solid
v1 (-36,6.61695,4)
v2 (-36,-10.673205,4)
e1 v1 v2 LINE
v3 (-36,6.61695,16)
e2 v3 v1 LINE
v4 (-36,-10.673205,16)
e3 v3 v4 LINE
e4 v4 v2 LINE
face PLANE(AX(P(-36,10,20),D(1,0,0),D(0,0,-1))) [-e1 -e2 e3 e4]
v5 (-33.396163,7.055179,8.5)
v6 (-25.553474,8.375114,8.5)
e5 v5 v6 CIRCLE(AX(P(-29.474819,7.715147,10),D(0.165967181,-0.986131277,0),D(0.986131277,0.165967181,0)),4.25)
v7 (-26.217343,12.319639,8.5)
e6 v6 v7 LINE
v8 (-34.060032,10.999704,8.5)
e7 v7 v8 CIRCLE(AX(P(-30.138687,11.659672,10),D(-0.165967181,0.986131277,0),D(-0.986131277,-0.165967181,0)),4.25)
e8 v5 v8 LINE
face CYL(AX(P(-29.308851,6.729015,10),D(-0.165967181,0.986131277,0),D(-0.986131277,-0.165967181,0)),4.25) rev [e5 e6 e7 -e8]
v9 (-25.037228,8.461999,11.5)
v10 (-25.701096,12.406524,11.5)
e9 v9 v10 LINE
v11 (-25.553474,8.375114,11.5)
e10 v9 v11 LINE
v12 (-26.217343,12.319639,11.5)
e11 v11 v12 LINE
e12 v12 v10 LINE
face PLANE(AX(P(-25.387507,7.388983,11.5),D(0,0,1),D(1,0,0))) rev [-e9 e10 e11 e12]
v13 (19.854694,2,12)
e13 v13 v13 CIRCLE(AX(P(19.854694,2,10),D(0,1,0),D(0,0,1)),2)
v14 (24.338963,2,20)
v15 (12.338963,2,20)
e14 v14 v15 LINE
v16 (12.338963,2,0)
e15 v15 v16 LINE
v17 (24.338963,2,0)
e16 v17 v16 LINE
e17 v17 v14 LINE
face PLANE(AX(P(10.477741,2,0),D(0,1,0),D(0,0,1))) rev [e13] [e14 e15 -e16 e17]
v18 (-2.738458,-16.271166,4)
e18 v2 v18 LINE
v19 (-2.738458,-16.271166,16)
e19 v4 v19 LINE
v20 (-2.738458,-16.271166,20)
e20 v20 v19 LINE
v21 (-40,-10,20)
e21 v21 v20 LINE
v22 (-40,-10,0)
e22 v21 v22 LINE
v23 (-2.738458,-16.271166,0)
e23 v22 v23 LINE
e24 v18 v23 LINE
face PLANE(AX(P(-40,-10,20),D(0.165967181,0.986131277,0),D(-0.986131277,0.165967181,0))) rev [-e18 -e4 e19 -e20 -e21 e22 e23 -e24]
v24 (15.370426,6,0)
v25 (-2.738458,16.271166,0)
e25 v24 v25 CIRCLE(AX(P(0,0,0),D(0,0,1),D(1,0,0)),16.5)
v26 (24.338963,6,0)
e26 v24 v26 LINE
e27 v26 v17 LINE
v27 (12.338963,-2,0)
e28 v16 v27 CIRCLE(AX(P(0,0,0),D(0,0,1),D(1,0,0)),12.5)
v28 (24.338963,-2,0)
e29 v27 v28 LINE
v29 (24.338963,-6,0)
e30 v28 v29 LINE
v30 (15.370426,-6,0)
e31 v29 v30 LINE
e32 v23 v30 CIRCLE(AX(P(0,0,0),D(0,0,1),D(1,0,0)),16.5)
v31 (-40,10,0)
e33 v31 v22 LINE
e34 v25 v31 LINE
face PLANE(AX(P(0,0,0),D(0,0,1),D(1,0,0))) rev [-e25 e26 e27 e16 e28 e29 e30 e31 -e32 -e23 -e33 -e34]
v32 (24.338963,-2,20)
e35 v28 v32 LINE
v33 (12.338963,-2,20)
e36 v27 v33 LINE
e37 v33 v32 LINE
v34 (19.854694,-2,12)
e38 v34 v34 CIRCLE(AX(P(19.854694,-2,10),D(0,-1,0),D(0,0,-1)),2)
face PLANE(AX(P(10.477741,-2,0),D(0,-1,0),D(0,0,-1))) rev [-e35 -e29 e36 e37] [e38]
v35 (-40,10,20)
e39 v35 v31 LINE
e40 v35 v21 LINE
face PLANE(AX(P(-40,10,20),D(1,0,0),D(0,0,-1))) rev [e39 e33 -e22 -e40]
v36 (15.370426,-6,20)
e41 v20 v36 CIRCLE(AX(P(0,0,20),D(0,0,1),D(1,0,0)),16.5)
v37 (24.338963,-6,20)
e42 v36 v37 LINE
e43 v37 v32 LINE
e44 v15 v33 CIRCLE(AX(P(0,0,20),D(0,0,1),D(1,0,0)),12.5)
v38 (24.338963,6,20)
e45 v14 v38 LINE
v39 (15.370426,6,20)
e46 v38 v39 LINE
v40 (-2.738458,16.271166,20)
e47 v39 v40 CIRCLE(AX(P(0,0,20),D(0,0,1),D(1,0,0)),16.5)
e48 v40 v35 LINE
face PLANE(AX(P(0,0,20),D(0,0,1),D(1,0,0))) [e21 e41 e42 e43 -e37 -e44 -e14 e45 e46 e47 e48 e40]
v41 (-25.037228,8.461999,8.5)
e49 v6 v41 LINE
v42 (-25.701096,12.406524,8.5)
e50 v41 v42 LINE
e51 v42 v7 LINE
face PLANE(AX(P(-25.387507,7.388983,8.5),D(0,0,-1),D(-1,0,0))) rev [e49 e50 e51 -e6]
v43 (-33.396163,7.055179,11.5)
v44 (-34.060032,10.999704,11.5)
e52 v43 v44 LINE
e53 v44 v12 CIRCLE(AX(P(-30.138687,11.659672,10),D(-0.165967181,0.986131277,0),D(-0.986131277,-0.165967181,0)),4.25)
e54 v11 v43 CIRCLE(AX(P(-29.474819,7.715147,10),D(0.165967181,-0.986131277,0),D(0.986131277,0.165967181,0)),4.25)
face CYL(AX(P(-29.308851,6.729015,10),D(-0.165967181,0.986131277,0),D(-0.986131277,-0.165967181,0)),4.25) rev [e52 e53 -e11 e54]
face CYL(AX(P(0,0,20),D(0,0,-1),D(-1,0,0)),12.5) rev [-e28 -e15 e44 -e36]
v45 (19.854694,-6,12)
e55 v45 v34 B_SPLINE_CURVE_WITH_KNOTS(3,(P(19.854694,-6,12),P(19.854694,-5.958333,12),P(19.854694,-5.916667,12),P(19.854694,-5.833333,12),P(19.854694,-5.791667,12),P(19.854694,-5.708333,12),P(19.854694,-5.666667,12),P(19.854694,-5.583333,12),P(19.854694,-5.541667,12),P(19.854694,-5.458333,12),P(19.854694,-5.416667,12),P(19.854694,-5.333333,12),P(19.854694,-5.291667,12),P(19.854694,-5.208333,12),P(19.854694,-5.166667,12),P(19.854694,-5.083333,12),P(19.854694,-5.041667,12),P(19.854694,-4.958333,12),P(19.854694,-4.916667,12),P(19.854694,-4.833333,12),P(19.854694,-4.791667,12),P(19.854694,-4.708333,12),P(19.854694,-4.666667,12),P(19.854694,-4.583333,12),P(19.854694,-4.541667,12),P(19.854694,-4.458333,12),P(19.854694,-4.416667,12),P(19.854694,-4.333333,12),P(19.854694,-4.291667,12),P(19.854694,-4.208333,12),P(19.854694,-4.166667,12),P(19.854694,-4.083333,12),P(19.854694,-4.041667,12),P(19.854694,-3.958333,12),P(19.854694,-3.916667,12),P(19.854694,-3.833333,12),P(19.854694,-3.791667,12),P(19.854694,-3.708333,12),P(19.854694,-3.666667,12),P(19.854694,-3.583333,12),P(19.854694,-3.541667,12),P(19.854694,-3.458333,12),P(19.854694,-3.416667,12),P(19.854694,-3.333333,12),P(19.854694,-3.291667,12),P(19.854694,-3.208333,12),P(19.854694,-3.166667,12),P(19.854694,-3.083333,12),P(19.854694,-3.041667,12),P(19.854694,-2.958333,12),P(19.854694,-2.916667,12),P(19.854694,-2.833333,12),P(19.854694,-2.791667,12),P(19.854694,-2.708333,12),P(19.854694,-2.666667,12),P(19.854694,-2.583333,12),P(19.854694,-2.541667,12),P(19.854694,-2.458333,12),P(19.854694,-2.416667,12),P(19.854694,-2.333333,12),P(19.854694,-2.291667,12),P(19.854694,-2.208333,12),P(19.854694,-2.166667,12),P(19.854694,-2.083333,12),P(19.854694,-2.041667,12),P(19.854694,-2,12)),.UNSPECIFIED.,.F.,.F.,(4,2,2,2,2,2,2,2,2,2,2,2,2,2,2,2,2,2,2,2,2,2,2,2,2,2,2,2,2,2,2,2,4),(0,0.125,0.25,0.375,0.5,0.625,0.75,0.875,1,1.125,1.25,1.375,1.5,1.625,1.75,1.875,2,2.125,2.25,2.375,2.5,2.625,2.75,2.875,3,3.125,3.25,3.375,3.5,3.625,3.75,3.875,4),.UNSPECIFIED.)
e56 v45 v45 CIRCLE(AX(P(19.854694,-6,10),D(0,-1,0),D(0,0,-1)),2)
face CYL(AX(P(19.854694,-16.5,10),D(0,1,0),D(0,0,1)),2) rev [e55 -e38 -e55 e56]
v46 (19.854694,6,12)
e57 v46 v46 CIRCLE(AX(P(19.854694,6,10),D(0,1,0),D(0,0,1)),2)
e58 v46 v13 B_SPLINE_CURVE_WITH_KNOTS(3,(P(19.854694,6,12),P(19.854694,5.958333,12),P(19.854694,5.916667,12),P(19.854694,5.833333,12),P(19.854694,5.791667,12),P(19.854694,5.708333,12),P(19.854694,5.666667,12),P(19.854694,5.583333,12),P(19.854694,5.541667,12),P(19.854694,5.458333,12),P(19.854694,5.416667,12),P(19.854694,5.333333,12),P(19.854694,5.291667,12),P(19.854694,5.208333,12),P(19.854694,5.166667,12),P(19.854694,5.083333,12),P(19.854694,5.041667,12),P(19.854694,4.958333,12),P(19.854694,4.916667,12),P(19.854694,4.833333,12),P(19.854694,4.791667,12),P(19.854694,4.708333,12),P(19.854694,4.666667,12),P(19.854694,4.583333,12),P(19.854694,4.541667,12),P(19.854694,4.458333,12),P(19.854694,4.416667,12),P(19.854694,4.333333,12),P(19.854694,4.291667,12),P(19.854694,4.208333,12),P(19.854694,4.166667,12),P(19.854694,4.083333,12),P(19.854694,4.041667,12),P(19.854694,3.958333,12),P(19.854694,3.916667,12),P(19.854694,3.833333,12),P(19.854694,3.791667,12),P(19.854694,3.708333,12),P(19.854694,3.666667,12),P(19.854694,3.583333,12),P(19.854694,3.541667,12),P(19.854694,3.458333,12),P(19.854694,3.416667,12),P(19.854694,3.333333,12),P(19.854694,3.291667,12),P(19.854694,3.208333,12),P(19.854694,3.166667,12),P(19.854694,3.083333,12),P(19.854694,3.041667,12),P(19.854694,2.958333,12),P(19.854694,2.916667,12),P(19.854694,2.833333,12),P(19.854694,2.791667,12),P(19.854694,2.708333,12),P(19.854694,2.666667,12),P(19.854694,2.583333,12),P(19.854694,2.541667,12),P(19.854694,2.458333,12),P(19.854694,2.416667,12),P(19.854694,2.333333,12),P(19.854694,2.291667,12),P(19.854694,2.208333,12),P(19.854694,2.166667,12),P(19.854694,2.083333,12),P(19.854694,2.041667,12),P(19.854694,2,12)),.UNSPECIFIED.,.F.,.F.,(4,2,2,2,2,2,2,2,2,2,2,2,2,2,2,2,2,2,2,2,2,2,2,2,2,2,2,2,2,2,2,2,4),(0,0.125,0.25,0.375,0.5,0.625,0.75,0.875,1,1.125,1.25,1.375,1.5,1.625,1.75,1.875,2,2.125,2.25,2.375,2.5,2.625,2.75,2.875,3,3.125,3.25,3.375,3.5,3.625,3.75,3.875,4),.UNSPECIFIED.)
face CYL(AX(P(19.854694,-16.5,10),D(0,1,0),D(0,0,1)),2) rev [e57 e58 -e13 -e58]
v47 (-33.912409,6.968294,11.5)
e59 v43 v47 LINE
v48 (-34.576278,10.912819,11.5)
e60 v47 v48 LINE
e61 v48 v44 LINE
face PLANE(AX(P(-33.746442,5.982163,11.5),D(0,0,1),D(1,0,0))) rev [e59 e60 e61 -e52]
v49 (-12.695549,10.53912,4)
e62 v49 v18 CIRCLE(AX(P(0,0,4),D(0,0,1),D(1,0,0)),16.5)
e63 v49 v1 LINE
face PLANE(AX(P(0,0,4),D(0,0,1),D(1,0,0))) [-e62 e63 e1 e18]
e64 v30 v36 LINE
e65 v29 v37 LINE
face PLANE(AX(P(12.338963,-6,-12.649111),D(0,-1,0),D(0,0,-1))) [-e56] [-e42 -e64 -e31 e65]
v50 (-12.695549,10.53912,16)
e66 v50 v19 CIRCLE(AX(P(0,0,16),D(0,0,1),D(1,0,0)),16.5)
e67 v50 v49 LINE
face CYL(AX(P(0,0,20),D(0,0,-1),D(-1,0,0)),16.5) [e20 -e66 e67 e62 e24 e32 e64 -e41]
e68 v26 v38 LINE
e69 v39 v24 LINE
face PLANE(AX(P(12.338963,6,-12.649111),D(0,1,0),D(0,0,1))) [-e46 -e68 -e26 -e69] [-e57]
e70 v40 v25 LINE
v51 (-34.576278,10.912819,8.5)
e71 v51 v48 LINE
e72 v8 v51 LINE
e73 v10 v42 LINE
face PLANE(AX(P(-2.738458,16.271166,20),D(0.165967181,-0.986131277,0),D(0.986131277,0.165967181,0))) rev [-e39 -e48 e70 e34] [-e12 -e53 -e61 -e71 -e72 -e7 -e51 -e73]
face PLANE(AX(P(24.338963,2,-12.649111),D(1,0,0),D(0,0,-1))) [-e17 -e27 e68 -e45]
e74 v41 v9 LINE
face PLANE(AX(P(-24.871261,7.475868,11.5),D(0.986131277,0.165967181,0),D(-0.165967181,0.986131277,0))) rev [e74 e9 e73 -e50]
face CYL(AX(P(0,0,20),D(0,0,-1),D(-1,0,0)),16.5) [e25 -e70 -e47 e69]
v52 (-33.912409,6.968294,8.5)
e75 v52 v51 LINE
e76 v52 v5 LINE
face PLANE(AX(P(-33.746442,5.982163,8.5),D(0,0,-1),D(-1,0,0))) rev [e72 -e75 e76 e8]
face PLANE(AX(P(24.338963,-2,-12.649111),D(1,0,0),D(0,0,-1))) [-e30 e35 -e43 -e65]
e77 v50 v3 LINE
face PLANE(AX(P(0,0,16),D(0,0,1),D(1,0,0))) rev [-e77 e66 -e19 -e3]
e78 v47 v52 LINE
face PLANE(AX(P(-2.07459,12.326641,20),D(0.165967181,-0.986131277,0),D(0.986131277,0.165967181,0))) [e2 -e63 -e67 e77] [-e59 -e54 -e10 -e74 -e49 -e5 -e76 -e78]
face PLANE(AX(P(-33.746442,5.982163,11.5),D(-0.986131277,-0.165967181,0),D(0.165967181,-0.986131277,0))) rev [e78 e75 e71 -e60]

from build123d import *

# Parameters (mm, degrees)
SKETCH1_R               = 12.5
BOSS_EXTRUDE1_DEPTH     = 20
SHELL1_START            = 4
SHELL1_DEPTH            = 12
CUT_EXTRUDE1_DEPTH      = 5
CUT_EXTRUDE2_DEPTH      = 48.668123521
CUT_EXTRUDE2_DEPTH_BACK = 48.668123521
SKETCH5_W               = 12.044517282
SKETCH5_H               = 4
SKETCH6_W               = 12
SKETCH6_H               = 4
BOSS_EXTRUDE2_DEPTH     = 20
SKETCH7_R               = 2
CUT_EXTRUDE3_DEPTH      = 51.062460986


# Read off the part's stored shape, not the designer's step: Shell1
with BuildPart() as part:
    # Sketch1 → Boss-Extrude1 (new body)
    with BuildSketch(Plane.XY):
        with BuildLine():
            Line((-2.738458484, 16.271166066), (-40, 10))
            Line((-40, 10), (-40, -10))
            Line((-40, -10), (-2.738458484, -16.271166066))
            ThreePointArc((-2.738458484, -16.271166066), (16.5, 0), (-2.738458484, 16.271166066))
        make_face()
        Circle(SKETCH1_R, mode=Mode.SUBTRACT)
    extrude(amount=BOSS_EXTRUDE1_DEPTH)

    # Shell1 outline → Shell1 (cut)
    with BuildSketch(Plane.XY.offset(SHELL1_START)):
        with BuildLine():
            Line((-36, -10.67320522), (-2.738458484, -16.271166065))
            ThreePointArc((-2.738458484, -16.271166065), (-15.467708297, -5.744562646), (-12.695548653, 10.539119716))
            Line((-12.695548653, 10.539119716), (-36, 6.616950141))
            Line((-36, 6.616950141), (-36, -10.67320522))
        make_face()
    extrude(amount=SHELL1_DEPTH, mode=Mode.SUBTRACT)

    # Sketch4 → Cut-Extrude1 (cut)
    with BuildSketch(Plane(origin=(-2.738458484, 16.271166066, 0), x_dir=(0.9861312767016037, 0.16596718082459888, 0), z_dir=(-0.16596718082459888, 0.9861312767016037, 0))):
        with BuildLine():
            Line((-23.80908583, -8.5), (-23.28557926, -8.5))
            Line((-23.28557926, -8.5), (-23.28557926, -11.5))
            Line((-23.28557926, -11.5), (-23.80908583, -11.5))
            ThreePointArc((-23.80908583, -11.5), (-27.78557926, -14.25), (-31.76207269, -11.5))
            Line((-31.76207269, -11.5), (-32.28557926, -11.5))
            Line((-32.28557926, -11.5), (-32.28557926, -8.5))
            Line((-32.28557926, -8.5), (-31.76207269, -8.5))
            ThreePointArc((-31.76207269, -8.5), (-27.78557926, -5.75), (-23.80908583, -8.5))
        make_face()
    extrude(amount=-CUT_EXTRUDE1_DEPTH, mode=Mode.SUBTRACT)

    # Sketch5 → Cut-Extrude2 (cut, two sides: drawn at the far end of the back side and taken through both)
    with BuildSketch(Plane.XY.offset(20).offset(-CUT_EXTRUDE2_DEPTH_BACK)):
        with Locations((16.5, 0)):
            Rectangle(SKETCH5_W, SKETCH5_H)
    extrude(amount=CUT_EXTRUDE2_DEPTH + CUT_EXTRUDE2_DEPTH_BACK, mode=Mode.SUBTRACT)

    # Sketch6 → Boss-Extrude2 (add)
    with BuildSketch(Plane.XY.offset(20)):
        with Locations((18.338962679, -4)):
            Rectangle(SKETCH6_W, SKETCH6_H)
        with Locations((18.338962679, 4)):
            Rectangle(SKETCH6_W, SKETCH6_H)
    extrude(amount=-BOSS_EXTRUDE2_DEPTH)

    # Sketch7 → Cut-Extrude3 (cut, through all)
    with BuildSketch(Plane(origin=(0, 6, 0), x_dir=(1, 0, 0), z_dir=(0, 1, 0))):
        with Locations(Location((19.854694414, -10, 0), (0, 0, 270))):
            Circle(SKETCH7_R)
    extrude(amount=-CUT_EXTRUDE3_DEPTH, mode=Mode.SUBTRACT)


solid = part.part
